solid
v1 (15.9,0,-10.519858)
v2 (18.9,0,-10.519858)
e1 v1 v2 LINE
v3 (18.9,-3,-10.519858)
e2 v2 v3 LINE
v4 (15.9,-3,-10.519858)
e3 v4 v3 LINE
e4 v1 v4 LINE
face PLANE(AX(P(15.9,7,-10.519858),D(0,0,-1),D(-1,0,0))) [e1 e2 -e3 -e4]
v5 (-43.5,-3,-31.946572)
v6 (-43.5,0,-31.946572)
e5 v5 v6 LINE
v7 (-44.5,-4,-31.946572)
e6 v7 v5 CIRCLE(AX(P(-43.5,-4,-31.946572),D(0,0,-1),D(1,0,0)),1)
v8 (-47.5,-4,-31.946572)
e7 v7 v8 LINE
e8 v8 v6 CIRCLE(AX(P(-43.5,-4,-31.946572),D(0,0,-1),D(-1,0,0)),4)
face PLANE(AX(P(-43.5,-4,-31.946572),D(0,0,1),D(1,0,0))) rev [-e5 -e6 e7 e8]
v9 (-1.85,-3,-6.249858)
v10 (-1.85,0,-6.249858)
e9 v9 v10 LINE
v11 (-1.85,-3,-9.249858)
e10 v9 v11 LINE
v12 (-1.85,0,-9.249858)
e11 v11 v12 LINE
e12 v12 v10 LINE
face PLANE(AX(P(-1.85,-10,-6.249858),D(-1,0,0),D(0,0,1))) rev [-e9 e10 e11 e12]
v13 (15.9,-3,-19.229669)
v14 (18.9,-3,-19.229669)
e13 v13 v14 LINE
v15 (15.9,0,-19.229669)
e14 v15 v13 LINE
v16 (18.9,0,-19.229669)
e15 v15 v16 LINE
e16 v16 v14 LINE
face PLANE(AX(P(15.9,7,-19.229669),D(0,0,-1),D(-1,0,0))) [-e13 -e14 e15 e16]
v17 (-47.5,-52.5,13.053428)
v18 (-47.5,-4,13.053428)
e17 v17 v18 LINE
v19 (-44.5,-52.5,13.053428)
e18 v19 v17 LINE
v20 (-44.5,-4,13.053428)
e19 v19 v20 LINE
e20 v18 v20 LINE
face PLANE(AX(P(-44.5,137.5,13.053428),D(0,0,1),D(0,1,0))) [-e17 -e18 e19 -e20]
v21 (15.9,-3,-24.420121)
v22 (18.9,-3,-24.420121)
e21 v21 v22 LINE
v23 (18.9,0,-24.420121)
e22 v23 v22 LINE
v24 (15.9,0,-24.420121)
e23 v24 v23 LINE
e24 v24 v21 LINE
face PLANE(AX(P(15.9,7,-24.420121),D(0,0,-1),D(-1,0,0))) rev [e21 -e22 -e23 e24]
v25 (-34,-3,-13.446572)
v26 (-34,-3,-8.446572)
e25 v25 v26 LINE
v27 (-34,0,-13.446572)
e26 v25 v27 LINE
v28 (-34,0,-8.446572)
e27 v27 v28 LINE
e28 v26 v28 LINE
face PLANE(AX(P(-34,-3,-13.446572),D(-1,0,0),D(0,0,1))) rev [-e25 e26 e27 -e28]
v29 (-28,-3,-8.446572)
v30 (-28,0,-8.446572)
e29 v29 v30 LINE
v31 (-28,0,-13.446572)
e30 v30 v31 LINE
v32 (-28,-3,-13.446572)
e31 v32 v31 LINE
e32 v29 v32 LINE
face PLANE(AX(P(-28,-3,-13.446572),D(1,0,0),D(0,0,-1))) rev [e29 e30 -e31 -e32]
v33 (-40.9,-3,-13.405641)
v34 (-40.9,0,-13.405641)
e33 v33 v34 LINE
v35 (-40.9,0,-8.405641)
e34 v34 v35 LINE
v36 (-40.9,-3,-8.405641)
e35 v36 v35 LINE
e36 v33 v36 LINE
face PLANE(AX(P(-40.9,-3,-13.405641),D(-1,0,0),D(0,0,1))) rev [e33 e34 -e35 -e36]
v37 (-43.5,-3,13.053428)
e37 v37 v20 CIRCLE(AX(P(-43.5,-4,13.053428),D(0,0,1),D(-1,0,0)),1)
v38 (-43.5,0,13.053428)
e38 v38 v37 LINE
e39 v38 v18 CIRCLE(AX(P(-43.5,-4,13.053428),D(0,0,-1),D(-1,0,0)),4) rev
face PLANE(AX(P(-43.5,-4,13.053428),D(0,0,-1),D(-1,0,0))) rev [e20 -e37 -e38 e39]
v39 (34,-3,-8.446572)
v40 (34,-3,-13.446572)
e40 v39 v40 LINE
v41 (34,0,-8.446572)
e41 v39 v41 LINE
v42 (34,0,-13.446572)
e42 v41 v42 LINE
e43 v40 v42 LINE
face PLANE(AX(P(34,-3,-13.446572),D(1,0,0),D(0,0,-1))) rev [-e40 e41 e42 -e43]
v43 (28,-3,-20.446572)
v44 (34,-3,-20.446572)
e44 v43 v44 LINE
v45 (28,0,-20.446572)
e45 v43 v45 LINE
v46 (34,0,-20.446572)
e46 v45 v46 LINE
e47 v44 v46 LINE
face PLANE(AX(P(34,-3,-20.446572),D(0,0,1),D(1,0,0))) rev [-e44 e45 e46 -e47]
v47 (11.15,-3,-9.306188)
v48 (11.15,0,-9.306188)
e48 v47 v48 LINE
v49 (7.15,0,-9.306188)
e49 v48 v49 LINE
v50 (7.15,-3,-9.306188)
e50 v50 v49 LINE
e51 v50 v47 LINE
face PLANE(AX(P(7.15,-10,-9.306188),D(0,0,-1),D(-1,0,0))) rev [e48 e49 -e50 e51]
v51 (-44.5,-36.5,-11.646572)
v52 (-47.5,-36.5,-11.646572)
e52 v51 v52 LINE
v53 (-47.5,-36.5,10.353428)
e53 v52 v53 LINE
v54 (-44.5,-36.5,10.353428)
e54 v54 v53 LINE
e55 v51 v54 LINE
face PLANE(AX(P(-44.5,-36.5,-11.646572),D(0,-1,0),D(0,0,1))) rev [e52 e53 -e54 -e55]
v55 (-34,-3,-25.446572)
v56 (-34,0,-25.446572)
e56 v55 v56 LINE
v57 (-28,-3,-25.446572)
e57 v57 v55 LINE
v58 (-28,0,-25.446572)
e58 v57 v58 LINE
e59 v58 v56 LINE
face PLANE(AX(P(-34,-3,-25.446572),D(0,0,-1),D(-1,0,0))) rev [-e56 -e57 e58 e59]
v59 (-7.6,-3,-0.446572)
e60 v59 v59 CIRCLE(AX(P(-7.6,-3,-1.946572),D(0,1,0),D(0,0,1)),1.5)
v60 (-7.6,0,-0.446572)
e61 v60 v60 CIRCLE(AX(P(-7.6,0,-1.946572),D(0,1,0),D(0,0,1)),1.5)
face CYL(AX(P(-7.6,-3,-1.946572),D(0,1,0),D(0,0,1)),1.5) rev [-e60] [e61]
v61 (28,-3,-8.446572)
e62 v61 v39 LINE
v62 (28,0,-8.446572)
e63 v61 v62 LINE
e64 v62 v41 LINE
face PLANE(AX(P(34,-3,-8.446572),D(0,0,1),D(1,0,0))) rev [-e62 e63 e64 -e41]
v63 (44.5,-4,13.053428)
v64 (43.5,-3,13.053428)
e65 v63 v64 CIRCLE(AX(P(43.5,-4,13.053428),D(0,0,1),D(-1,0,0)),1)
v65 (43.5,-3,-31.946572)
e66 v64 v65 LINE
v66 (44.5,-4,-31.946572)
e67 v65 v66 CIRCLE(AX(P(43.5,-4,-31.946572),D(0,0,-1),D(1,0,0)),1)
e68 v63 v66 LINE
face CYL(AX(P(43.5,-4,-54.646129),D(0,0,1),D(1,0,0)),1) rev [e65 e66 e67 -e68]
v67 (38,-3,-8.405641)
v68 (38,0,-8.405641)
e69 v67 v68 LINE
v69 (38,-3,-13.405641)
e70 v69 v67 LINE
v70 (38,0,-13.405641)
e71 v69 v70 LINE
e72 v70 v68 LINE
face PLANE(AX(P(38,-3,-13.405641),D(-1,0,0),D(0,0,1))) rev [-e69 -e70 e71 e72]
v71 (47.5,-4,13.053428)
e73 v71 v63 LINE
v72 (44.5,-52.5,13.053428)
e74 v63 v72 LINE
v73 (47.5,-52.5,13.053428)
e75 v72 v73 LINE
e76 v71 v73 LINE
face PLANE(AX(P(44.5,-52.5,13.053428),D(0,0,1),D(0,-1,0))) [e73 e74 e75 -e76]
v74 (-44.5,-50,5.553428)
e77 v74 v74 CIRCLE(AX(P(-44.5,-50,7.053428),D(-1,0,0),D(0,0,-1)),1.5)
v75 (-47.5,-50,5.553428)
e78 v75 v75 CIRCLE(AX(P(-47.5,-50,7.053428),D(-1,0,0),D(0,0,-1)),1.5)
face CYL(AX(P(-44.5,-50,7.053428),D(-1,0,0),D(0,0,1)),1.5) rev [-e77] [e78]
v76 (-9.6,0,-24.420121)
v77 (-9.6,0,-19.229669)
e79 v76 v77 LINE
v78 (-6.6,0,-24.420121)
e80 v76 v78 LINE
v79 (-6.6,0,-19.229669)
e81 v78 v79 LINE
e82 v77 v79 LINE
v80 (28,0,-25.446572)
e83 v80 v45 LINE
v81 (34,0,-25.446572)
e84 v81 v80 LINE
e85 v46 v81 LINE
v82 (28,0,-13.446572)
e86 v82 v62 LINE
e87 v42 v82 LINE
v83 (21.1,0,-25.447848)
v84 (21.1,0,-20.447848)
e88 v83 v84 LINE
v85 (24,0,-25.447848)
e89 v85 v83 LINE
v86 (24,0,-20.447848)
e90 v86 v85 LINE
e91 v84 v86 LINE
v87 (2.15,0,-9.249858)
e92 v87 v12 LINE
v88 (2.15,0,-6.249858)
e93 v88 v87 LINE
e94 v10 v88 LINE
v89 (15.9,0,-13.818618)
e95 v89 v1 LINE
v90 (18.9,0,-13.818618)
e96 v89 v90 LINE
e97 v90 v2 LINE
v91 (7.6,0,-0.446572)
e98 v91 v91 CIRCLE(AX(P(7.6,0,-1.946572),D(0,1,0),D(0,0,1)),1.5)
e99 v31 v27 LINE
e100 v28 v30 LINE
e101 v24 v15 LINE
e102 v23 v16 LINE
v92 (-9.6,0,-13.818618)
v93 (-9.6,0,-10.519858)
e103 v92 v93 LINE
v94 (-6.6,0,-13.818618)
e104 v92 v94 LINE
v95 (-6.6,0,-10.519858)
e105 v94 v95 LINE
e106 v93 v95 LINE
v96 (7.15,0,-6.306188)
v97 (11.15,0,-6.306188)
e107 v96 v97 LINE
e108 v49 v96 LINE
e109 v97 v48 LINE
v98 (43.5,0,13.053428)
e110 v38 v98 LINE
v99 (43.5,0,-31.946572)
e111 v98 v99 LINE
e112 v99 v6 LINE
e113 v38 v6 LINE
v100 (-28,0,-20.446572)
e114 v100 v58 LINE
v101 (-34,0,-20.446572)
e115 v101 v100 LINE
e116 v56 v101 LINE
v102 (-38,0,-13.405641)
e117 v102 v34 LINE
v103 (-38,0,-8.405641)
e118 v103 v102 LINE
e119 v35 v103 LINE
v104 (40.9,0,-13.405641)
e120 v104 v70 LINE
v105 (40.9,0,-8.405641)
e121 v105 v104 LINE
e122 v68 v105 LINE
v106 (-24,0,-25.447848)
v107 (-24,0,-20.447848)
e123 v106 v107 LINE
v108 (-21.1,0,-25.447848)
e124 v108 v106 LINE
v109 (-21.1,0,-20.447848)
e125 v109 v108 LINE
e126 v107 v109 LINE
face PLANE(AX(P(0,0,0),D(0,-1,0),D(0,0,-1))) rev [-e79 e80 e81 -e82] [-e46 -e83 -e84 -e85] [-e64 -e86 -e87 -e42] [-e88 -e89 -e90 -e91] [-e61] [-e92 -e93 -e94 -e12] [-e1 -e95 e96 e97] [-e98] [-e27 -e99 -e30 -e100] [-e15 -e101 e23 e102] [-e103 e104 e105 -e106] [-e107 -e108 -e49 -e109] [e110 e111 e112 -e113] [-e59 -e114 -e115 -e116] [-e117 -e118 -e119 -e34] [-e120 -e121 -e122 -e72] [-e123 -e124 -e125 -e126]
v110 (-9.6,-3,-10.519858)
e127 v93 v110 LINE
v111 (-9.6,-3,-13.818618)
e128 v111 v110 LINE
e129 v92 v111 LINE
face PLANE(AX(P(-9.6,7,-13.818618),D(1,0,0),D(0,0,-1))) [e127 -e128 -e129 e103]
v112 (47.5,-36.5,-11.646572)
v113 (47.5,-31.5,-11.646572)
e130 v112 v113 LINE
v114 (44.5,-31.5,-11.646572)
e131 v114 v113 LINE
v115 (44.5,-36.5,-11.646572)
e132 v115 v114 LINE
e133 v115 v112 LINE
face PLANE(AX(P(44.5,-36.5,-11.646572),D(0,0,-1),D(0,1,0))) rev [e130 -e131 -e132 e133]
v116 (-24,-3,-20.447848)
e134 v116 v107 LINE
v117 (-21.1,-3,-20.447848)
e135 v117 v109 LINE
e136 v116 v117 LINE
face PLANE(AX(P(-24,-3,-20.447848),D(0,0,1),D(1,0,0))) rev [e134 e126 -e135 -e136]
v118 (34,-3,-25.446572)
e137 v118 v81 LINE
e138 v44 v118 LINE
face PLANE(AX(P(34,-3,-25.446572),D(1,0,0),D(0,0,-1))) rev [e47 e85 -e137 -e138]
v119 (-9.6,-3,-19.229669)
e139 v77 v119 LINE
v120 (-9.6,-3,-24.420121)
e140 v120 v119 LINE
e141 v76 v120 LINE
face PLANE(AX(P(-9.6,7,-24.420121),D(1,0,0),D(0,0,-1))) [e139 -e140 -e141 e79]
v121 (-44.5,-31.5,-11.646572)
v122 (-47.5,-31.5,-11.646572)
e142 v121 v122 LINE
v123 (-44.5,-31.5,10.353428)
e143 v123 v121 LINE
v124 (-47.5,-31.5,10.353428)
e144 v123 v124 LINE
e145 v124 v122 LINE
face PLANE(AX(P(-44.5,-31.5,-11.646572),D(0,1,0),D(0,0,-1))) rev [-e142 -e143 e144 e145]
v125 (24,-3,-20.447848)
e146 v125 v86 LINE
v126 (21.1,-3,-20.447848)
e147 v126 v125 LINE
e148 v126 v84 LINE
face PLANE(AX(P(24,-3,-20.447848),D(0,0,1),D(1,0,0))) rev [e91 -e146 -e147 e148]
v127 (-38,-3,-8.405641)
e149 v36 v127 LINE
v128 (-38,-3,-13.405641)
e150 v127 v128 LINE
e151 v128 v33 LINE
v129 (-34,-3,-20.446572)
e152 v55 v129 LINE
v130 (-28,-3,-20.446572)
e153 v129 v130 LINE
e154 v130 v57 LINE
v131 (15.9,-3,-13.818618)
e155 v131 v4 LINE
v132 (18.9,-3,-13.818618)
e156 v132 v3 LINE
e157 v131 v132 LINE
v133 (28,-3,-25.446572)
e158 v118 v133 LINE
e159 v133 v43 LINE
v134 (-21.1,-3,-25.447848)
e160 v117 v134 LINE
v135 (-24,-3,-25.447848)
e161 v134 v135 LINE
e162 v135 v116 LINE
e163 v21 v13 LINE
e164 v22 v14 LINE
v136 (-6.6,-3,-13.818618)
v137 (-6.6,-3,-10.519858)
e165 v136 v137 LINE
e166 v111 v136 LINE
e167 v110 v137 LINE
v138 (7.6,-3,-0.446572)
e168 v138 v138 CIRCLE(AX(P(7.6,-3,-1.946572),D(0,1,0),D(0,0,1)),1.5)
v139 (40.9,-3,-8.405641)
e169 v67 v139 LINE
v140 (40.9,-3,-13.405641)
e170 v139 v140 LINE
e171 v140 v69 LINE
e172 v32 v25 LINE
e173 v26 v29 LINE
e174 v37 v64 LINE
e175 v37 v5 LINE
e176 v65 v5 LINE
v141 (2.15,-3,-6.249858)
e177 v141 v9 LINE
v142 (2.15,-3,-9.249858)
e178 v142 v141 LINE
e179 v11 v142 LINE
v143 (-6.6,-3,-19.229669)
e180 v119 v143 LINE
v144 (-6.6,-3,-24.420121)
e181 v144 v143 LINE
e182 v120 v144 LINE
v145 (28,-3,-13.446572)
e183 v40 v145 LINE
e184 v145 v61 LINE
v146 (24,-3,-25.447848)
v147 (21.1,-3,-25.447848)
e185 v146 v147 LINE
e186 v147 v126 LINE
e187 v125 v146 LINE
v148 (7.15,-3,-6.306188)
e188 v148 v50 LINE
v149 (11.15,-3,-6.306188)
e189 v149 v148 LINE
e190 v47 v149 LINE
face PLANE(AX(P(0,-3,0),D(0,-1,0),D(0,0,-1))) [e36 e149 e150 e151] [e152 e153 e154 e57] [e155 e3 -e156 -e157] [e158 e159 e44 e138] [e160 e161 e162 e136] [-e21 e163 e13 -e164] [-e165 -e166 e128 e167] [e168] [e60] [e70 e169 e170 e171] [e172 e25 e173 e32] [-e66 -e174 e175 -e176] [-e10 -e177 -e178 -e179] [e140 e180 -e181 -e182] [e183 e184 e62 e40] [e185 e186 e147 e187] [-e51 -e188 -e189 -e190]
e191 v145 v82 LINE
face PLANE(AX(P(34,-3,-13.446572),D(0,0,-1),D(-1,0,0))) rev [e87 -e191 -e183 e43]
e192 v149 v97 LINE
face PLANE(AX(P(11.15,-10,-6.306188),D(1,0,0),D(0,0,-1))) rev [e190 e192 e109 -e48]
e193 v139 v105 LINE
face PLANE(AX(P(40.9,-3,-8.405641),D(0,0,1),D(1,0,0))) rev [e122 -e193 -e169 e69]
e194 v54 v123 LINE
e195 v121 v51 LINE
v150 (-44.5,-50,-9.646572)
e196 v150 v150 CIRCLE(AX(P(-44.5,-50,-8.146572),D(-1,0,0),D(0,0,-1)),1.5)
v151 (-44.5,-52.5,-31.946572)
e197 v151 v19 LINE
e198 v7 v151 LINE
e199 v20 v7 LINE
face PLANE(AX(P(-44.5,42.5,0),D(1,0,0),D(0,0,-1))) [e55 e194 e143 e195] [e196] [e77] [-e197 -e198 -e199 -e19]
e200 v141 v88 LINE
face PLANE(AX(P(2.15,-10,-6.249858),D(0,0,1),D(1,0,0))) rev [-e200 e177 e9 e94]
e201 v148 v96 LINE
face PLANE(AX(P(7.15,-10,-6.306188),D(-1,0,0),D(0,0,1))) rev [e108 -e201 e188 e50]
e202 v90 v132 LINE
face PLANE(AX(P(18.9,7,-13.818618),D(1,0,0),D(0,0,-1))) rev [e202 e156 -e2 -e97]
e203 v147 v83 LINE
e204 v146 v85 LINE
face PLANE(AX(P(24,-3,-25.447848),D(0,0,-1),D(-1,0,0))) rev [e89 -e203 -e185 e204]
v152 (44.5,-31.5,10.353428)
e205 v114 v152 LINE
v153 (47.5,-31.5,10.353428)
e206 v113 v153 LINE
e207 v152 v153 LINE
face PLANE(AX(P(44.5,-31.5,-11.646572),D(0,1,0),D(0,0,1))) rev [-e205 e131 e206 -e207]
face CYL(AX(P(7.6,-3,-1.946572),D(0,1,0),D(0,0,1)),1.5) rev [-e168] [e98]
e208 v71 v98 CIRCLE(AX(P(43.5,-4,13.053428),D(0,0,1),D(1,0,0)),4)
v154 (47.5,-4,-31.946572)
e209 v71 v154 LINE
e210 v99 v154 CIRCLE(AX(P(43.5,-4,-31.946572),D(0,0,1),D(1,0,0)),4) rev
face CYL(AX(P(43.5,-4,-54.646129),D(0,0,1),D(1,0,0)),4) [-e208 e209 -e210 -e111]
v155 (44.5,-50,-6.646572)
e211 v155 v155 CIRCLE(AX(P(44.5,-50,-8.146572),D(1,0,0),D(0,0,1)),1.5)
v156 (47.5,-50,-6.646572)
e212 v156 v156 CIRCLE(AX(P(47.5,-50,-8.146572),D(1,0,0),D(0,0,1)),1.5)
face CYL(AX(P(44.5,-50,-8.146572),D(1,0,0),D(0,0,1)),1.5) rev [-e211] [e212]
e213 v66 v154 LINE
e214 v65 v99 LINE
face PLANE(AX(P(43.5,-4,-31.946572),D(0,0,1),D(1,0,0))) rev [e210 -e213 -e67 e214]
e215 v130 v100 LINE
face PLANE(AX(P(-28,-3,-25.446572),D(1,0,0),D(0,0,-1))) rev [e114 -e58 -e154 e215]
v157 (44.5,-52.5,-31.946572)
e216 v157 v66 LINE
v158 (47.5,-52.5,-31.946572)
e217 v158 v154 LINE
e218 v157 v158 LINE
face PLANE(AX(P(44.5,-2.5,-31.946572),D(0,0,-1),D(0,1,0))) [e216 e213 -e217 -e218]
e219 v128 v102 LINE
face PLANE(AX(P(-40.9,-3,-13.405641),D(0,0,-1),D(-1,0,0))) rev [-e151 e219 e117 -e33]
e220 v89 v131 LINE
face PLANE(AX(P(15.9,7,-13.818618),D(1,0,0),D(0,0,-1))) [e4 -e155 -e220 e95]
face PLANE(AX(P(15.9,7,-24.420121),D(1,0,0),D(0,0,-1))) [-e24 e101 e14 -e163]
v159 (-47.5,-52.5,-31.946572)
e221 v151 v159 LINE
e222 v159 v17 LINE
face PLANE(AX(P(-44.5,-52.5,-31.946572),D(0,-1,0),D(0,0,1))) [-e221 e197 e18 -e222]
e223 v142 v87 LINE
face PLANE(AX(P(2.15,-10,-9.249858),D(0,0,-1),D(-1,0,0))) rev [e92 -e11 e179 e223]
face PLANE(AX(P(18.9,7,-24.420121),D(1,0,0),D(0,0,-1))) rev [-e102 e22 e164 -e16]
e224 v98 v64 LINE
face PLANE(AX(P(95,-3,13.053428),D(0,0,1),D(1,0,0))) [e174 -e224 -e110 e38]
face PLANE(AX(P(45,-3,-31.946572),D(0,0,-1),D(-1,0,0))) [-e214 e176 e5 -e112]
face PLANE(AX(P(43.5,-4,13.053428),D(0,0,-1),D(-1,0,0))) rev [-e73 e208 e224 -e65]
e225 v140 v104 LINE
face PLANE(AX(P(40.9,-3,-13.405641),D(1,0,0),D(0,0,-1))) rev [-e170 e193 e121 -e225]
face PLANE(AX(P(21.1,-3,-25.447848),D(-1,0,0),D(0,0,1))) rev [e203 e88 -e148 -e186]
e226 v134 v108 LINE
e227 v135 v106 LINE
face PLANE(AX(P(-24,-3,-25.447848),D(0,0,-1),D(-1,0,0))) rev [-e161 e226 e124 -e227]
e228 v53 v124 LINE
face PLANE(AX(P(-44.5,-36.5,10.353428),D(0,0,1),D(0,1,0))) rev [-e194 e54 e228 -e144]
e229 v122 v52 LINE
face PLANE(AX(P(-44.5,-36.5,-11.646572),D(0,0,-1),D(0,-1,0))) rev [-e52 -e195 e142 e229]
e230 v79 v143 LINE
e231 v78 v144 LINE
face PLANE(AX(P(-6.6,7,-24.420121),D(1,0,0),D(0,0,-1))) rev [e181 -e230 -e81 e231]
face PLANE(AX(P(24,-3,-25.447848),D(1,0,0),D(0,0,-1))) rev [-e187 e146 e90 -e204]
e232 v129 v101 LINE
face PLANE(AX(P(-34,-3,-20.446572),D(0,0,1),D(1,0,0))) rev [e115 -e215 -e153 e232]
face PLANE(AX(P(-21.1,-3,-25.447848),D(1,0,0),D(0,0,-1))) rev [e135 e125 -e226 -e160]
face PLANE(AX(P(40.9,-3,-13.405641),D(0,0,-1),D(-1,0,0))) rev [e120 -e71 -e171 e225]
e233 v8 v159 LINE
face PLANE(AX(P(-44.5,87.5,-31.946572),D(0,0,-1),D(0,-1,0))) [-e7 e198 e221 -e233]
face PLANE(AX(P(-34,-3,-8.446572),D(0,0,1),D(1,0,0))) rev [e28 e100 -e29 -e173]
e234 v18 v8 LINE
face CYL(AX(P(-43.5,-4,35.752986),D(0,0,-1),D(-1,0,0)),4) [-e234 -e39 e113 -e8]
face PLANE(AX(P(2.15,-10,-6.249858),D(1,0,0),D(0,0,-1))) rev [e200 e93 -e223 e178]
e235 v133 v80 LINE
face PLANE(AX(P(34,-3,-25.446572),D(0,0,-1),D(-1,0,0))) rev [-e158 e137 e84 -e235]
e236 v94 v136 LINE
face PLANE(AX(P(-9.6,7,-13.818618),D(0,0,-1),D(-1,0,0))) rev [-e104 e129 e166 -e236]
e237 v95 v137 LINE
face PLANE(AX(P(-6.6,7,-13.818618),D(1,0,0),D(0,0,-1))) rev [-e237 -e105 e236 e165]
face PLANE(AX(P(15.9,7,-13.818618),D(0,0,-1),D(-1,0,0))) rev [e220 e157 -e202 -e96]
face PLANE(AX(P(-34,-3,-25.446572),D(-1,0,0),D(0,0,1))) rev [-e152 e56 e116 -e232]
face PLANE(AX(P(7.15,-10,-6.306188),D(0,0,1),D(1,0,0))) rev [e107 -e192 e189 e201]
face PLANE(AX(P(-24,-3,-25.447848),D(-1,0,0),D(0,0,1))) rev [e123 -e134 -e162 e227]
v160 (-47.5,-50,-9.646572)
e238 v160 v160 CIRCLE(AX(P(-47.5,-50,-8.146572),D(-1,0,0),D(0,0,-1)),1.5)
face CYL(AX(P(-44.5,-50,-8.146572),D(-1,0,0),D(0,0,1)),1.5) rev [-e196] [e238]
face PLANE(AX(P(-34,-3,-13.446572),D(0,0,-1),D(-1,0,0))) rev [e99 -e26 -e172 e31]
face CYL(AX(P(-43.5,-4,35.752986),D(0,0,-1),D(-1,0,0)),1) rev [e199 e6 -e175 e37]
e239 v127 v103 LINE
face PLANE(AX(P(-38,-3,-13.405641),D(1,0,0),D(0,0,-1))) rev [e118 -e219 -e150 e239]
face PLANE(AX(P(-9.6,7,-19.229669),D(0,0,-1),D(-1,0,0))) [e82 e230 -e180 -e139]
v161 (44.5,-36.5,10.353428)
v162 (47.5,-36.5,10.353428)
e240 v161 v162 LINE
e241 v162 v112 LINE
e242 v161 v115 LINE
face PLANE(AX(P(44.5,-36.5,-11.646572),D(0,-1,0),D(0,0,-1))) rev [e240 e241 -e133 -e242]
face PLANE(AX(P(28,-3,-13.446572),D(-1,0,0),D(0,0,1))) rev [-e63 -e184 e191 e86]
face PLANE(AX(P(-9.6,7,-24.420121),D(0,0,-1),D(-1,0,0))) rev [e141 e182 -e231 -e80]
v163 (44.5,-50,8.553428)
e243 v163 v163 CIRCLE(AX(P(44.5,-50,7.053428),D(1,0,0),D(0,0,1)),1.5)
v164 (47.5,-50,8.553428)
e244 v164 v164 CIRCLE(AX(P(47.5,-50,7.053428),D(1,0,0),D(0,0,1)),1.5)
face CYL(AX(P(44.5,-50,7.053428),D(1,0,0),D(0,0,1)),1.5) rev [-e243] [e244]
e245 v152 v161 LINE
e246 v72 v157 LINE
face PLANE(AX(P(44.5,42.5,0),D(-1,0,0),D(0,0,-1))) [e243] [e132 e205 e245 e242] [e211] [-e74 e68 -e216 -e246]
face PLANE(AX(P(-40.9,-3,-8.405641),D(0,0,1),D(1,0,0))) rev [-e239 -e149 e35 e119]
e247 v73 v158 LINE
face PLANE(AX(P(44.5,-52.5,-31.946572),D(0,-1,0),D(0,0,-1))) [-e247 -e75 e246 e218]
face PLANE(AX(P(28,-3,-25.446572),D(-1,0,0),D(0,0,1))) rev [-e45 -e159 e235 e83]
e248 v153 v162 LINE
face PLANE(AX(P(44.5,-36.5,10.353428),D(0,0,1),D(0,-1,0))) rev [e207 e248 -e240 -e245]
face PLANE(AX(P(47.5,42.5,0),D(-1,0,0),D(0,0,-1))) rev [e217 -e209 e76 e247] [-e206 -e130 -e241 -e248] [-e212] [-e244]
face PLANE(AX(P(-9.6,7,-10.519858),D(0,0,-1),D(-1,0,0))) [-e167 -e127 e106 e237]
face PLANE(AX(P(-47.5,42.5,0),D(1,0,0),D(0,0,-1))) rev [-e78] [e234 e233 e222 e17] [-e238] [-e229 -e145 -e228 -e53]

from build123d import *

# Parameters (mm, degrees)
SKETCH1_R                  = 1.5
SKETCH1_W                  = 2.9
SKETCH1_H                  = 5
SKETCH1_W_2                = 6
SKETCH1_W_3                = 5
SKETCH1_H_2                = 22
BASE_FLANGE1_DEPTH         = 3
SKETCH34_W                 = 3
SKETCH34_H                 = 5.190452684
SKETCH34_H_2               = 3.298760194
CUT_EXTRUDE2_DEPTH         = 10
SKETCH35_W                 = 4
SKETCH35_H                 = 3
CUT_EXTRUDE3_DEPTH         = 10
SKETCHED_START             = -31.946571622
SKETCHED_BEND1_DEPTH       = 45
SKETCHED_BEND1_2_OUTLINE_W = 3
SKETCHED_BEND1_2_OUTLINE_H = 16
SKETCHED_BEND1_2_DEPTH     = 45
SKETCHED_BEND1_3_OUTLINE_W = 3
SKETCHED_BEND1_3_OUTLINE_H = 5
SKETCHED_BEND1_3_DEPTH     = 20.3
SKETCHED_START_2           = 10.353428378
SKETCHED_BEND1_4_OUTLINE_W = 3
SKETCHED_BEND1_4_OUTLINE_H = 5
SKETCHED_BEND1_4_DEPTH     = 2.7
SKETCHED_START_3           = -48
SKETCHED_BEND1_5_OUTLINE_R = 1.5
SKETCHED_BEND1_5_DEPTH     = 96


with BuildPart() as part:
    # Base-Flange1: sheet metal written as solids
    # Sketch1 → Base-Flange1 (new body)
    with BuildSketch(Plane(origin=(0, 0, 0), x_dir=(1, 0, 0), z_dir=(0, 1, 0))):
        Polygon((-95, 31.946571622), (-95, -13.053428378), (95, -13.053428378), (95, 31.946571622), (45, 31.946571622), (-45, 31.946571622), align=None)
        with Locations(Location((92.5, -7.053428378, 0), (0, 0, 270))):
            Circle(SKETCH1_R, mode=Mode.SUBTRACT)
        with Locations(Location((92.5, 8.146571622, 0), (0, 0, 270))):
            Circle(SKETCH1_R, mode=Mode.SUBTRACT)
        with Locations(Location((-92.5, -7.053428378, 0), (0, 0, 90))):
            Circle(SKETCH1_R, mode=Mode.SUBTRACT)
        with Locations(Location((-92.5, 8.146571622, 0), (0, 0, 90))):
            Circle(SKETCH1_R, mode=Mode.SUBTRACT)
        with Locations(Location((7.6, 1.946571622, 0), (0, 0, 270))):
            Circle(SKETCH1_R, mode=Mode.SUBTRACT)
        with Locations(Location((-7.6, 1.946571622, 0), (0, 0, 270))):
            Circle(SKETCH1_R, mode=Mode.SUBTRACT)
        with Locations((-39.45, 10.905641405)):
            Rectangle(SKETCH1_W, SKETCH1_H, mode=Mode.SUBTRACT)
        with Locations((-22.55, 22.947848405)):
            Rectangle(SKETCH1_W, SKETCH1_H, mode=Mode.SUBTRACT)
        with Locations((-31, 22.946571622)):
            Rectangle(SKETCH1_W_2, SKETCH1_H, mode=Mode.SUBTRACT)
        with Locations((-31, 10.946571622)):
            Rectangle(SKETCH1_W_2, SKETCH1_H, mode=Mode.SUBTRACT)
        with Locations((31, 10.946571622)):
            Rectangle(SKETCH1_W_2, SKETCH1_H, mode=Mode.SUBTRACT)
        with Locations((31, 22.946571622)):
            Rectangle(SKETCH1_W_2, SKETCH1_H, mode=Mode.SUBTRACT)
        with Locations((22.55, 22.947848405)):
            Rectangle(SKETCH1_W, SKETCH1_H, mode=Mode.SUBTRACT)
        with Locations((39.45, 10.905641405)):
            Rectangle(SKETCH1_W, SKETCH1_H, mode=Mode.SUBTRACT)
        with Locations((76.5, 0.646571622)):
            Rectangle(SKETCH1_W_3, SKETCH1_H_2, mode=Mode.SUBTRACT)
        with Locations((-76.5, 0.646571622)):
            Rectangle(SKETCH1_W_3, SKETCH1_H_2, mode=Mode.SUBTRACT)
    extrude(amount=-BASE_FLANGE1_DEPTH)

    # Sketch34 → Cut-Extrude2 (cut)
    with BuildSketch(Plane.XZ.offset(3)):
        with Locations((17.4, -21.824895141)):
            Rectangle(SKETCH34_W, SKETCH34_H)
        with Locations((-8.1, -21.824895141)):
            Rectangle(SKETCH34_W, SKETCH34_H)
        with Locations((-8.1, -12.169238167)):
            Rectangle(SKETCH34_W, SKETCH34_H_2)
        with Locations((17.4, -12.169238167)):
            Rectangle(SKETCH34_W, SKETCH34_H_2)
    extrude(amount=-CUT_EXTRUDE2_DEPTH, mode=Mode.SUBTRACT)

    # Sketch35 → Cut-Extrude3 (cut)
    with BuildSketch(Plane(origin=(0, 0, 0), x_dir=(1, 0, 0), z_dir=(0, 1, 0))):
        with Locations((0.15, 7.74985807)):
            Rectangle(SKETCH35_W, SKETCH35_H)
        with Locations((9.15, 7.806187778)):
            Rectangle(SKETCH35_W, SKETCH35_H)
    extrude(amount=-CUT_EXTRUDE3_DEPTH, mode=Mode.SUBTRACT)

    # Sketched Bend1: read off the stored shape, not the designer's step
    # Sketched Bend1 outline → Sketched Bend1 (cut)
    with BuildSketch(Plane.XY.offset(SKETCHED_START)):
        with BuildLine():
            ThreePointArc((43.5, 0), (45.949489743, -0.83772234), (47.372983346, -3))
            Line((47.372983346, -3), (95, -3))
            Line((95, -3), (95, 0))
            Line((95, 0), (43.5, 0))
        make_face()
        with BuildLine():
            ThreePointArc((-47.372983346, -3), (-45.949489743, -0.83772234), (-43.5, 0))
            Line((-43.5, 0), (-95, 0))
            Line((-95, 0), (-95, -3))
            Line((-95, -3), (-47.372983346, -3))
        make_face()
    extrude(amount=SKETCHED_BEND1_DEPTH, mode=Mode.SUBTRACT)

    # Sketched Bend1 2 outline → Sketched Bend1 2 (add)
    with BuildSketch(Plane.XY.offset(SKETCHED_START)):
        with BuildLine():
            ThreePointArc((43.5, -3), (44.207106781, -3.292893219), (44.5, -4))
            Line((44.5, -4), (44.5, -31.5))
            Line((44.5, -31.5), (47.5, -31.5))
            Line((47.5, -31.5), (47.5, -4))
            ThreePointArc((47.5, -4), (47.468118785, -3.49598283), (47.372983346, -3))
            Line((47.372983346, -3), (43.5, -3))
        make_face()
        with BuildLine():
            ThreePointArc((-44.5, -4), (-44.207106781, -3.292893219), (-43.5, -3))
            Line((-43.5, -3), (-47.372983346, -3))
            ThreePointArc((-47.372983346, -3), (-47.468118785, -3.49598283), (-47.5, -4))
            Line((-47.5, -4), (-47.5, -31.5))
            Line((-47.5, -31.5), (-44.5, -31.5))
            Line((-44.5, -31.5), (-44.5, -4))
        make_face()
        with Locations((46, -44.5)):
            Rectangle(SKETCHED_BEND1_2_OUTLINE_W, SKETCHED_BEND1_2_OUTLINE_H)
        with Locations((-46, -44.5)):
            Rectangle(SKETCHED_BEND1_2_OUTLINE_W, SKETCHED_BEND1_2_OUTLINE_H)
    extrude(amount=SKETCHED_BEND1_2_DEPTH)

    # Sketched Bend1 3 outline → Sketched Bend1 3 (add)
    with BuildSketch(Plane.XY.offset(SKETCHED_START)):
        with Locations((46, -34)):
            Rectangle(SKETCHED_BEND1_3_OUTLINE_W, SKETCHED_BEND1_3_OUTLINE_H)
        with Locations((-46, -34)):
            Rectangle(SKETCHED_BEND1_3_OUTLINE_W, SKETCHED_BEND1_3_OUTLINE_H)
    extrude(amount=SKETCHED_BEND1_3_DEPTH)

    # Sketched Bend1 4 outline → Sketched Bend1 4 (add)
    with BuildSketch(Plane.XY.offset(SKETCHED_START_2)):
        with Locations((46, -34)):
            Rectangle(SKETCHED_BEND1_4_OUTLINE_W, SKETCHED_BEND1_4_OUTLINE_H)
        with Locations((-46, -34)):
            Rectangle(SKETCHED_BEND1_4_OUTLINE_W, SKETCHED_BEND1_4_OUTLINE_H)
    extrude(amount=SKETCHED_BEND1_4_DEPTH)

    # Sketched Bend1 5 outline → Sketched Bend1 5 (cut)
    with BuildSketch(Plane.YZ.offset(SKETCHED_START_3)):
        with Locations((-50, -8.146571622)):
            Circle(SKETCHED_BEND1_5_OUTLINE_R)
        with Locations((-50, 7.053428378)):
            Circle(SKETCHED_BEND1_5_OUTLINE_R)
    extrude(amount=SKETCHED_BEND1_5_DEPTH, mode=Mode.SUBTRACT)


solid = part.part
